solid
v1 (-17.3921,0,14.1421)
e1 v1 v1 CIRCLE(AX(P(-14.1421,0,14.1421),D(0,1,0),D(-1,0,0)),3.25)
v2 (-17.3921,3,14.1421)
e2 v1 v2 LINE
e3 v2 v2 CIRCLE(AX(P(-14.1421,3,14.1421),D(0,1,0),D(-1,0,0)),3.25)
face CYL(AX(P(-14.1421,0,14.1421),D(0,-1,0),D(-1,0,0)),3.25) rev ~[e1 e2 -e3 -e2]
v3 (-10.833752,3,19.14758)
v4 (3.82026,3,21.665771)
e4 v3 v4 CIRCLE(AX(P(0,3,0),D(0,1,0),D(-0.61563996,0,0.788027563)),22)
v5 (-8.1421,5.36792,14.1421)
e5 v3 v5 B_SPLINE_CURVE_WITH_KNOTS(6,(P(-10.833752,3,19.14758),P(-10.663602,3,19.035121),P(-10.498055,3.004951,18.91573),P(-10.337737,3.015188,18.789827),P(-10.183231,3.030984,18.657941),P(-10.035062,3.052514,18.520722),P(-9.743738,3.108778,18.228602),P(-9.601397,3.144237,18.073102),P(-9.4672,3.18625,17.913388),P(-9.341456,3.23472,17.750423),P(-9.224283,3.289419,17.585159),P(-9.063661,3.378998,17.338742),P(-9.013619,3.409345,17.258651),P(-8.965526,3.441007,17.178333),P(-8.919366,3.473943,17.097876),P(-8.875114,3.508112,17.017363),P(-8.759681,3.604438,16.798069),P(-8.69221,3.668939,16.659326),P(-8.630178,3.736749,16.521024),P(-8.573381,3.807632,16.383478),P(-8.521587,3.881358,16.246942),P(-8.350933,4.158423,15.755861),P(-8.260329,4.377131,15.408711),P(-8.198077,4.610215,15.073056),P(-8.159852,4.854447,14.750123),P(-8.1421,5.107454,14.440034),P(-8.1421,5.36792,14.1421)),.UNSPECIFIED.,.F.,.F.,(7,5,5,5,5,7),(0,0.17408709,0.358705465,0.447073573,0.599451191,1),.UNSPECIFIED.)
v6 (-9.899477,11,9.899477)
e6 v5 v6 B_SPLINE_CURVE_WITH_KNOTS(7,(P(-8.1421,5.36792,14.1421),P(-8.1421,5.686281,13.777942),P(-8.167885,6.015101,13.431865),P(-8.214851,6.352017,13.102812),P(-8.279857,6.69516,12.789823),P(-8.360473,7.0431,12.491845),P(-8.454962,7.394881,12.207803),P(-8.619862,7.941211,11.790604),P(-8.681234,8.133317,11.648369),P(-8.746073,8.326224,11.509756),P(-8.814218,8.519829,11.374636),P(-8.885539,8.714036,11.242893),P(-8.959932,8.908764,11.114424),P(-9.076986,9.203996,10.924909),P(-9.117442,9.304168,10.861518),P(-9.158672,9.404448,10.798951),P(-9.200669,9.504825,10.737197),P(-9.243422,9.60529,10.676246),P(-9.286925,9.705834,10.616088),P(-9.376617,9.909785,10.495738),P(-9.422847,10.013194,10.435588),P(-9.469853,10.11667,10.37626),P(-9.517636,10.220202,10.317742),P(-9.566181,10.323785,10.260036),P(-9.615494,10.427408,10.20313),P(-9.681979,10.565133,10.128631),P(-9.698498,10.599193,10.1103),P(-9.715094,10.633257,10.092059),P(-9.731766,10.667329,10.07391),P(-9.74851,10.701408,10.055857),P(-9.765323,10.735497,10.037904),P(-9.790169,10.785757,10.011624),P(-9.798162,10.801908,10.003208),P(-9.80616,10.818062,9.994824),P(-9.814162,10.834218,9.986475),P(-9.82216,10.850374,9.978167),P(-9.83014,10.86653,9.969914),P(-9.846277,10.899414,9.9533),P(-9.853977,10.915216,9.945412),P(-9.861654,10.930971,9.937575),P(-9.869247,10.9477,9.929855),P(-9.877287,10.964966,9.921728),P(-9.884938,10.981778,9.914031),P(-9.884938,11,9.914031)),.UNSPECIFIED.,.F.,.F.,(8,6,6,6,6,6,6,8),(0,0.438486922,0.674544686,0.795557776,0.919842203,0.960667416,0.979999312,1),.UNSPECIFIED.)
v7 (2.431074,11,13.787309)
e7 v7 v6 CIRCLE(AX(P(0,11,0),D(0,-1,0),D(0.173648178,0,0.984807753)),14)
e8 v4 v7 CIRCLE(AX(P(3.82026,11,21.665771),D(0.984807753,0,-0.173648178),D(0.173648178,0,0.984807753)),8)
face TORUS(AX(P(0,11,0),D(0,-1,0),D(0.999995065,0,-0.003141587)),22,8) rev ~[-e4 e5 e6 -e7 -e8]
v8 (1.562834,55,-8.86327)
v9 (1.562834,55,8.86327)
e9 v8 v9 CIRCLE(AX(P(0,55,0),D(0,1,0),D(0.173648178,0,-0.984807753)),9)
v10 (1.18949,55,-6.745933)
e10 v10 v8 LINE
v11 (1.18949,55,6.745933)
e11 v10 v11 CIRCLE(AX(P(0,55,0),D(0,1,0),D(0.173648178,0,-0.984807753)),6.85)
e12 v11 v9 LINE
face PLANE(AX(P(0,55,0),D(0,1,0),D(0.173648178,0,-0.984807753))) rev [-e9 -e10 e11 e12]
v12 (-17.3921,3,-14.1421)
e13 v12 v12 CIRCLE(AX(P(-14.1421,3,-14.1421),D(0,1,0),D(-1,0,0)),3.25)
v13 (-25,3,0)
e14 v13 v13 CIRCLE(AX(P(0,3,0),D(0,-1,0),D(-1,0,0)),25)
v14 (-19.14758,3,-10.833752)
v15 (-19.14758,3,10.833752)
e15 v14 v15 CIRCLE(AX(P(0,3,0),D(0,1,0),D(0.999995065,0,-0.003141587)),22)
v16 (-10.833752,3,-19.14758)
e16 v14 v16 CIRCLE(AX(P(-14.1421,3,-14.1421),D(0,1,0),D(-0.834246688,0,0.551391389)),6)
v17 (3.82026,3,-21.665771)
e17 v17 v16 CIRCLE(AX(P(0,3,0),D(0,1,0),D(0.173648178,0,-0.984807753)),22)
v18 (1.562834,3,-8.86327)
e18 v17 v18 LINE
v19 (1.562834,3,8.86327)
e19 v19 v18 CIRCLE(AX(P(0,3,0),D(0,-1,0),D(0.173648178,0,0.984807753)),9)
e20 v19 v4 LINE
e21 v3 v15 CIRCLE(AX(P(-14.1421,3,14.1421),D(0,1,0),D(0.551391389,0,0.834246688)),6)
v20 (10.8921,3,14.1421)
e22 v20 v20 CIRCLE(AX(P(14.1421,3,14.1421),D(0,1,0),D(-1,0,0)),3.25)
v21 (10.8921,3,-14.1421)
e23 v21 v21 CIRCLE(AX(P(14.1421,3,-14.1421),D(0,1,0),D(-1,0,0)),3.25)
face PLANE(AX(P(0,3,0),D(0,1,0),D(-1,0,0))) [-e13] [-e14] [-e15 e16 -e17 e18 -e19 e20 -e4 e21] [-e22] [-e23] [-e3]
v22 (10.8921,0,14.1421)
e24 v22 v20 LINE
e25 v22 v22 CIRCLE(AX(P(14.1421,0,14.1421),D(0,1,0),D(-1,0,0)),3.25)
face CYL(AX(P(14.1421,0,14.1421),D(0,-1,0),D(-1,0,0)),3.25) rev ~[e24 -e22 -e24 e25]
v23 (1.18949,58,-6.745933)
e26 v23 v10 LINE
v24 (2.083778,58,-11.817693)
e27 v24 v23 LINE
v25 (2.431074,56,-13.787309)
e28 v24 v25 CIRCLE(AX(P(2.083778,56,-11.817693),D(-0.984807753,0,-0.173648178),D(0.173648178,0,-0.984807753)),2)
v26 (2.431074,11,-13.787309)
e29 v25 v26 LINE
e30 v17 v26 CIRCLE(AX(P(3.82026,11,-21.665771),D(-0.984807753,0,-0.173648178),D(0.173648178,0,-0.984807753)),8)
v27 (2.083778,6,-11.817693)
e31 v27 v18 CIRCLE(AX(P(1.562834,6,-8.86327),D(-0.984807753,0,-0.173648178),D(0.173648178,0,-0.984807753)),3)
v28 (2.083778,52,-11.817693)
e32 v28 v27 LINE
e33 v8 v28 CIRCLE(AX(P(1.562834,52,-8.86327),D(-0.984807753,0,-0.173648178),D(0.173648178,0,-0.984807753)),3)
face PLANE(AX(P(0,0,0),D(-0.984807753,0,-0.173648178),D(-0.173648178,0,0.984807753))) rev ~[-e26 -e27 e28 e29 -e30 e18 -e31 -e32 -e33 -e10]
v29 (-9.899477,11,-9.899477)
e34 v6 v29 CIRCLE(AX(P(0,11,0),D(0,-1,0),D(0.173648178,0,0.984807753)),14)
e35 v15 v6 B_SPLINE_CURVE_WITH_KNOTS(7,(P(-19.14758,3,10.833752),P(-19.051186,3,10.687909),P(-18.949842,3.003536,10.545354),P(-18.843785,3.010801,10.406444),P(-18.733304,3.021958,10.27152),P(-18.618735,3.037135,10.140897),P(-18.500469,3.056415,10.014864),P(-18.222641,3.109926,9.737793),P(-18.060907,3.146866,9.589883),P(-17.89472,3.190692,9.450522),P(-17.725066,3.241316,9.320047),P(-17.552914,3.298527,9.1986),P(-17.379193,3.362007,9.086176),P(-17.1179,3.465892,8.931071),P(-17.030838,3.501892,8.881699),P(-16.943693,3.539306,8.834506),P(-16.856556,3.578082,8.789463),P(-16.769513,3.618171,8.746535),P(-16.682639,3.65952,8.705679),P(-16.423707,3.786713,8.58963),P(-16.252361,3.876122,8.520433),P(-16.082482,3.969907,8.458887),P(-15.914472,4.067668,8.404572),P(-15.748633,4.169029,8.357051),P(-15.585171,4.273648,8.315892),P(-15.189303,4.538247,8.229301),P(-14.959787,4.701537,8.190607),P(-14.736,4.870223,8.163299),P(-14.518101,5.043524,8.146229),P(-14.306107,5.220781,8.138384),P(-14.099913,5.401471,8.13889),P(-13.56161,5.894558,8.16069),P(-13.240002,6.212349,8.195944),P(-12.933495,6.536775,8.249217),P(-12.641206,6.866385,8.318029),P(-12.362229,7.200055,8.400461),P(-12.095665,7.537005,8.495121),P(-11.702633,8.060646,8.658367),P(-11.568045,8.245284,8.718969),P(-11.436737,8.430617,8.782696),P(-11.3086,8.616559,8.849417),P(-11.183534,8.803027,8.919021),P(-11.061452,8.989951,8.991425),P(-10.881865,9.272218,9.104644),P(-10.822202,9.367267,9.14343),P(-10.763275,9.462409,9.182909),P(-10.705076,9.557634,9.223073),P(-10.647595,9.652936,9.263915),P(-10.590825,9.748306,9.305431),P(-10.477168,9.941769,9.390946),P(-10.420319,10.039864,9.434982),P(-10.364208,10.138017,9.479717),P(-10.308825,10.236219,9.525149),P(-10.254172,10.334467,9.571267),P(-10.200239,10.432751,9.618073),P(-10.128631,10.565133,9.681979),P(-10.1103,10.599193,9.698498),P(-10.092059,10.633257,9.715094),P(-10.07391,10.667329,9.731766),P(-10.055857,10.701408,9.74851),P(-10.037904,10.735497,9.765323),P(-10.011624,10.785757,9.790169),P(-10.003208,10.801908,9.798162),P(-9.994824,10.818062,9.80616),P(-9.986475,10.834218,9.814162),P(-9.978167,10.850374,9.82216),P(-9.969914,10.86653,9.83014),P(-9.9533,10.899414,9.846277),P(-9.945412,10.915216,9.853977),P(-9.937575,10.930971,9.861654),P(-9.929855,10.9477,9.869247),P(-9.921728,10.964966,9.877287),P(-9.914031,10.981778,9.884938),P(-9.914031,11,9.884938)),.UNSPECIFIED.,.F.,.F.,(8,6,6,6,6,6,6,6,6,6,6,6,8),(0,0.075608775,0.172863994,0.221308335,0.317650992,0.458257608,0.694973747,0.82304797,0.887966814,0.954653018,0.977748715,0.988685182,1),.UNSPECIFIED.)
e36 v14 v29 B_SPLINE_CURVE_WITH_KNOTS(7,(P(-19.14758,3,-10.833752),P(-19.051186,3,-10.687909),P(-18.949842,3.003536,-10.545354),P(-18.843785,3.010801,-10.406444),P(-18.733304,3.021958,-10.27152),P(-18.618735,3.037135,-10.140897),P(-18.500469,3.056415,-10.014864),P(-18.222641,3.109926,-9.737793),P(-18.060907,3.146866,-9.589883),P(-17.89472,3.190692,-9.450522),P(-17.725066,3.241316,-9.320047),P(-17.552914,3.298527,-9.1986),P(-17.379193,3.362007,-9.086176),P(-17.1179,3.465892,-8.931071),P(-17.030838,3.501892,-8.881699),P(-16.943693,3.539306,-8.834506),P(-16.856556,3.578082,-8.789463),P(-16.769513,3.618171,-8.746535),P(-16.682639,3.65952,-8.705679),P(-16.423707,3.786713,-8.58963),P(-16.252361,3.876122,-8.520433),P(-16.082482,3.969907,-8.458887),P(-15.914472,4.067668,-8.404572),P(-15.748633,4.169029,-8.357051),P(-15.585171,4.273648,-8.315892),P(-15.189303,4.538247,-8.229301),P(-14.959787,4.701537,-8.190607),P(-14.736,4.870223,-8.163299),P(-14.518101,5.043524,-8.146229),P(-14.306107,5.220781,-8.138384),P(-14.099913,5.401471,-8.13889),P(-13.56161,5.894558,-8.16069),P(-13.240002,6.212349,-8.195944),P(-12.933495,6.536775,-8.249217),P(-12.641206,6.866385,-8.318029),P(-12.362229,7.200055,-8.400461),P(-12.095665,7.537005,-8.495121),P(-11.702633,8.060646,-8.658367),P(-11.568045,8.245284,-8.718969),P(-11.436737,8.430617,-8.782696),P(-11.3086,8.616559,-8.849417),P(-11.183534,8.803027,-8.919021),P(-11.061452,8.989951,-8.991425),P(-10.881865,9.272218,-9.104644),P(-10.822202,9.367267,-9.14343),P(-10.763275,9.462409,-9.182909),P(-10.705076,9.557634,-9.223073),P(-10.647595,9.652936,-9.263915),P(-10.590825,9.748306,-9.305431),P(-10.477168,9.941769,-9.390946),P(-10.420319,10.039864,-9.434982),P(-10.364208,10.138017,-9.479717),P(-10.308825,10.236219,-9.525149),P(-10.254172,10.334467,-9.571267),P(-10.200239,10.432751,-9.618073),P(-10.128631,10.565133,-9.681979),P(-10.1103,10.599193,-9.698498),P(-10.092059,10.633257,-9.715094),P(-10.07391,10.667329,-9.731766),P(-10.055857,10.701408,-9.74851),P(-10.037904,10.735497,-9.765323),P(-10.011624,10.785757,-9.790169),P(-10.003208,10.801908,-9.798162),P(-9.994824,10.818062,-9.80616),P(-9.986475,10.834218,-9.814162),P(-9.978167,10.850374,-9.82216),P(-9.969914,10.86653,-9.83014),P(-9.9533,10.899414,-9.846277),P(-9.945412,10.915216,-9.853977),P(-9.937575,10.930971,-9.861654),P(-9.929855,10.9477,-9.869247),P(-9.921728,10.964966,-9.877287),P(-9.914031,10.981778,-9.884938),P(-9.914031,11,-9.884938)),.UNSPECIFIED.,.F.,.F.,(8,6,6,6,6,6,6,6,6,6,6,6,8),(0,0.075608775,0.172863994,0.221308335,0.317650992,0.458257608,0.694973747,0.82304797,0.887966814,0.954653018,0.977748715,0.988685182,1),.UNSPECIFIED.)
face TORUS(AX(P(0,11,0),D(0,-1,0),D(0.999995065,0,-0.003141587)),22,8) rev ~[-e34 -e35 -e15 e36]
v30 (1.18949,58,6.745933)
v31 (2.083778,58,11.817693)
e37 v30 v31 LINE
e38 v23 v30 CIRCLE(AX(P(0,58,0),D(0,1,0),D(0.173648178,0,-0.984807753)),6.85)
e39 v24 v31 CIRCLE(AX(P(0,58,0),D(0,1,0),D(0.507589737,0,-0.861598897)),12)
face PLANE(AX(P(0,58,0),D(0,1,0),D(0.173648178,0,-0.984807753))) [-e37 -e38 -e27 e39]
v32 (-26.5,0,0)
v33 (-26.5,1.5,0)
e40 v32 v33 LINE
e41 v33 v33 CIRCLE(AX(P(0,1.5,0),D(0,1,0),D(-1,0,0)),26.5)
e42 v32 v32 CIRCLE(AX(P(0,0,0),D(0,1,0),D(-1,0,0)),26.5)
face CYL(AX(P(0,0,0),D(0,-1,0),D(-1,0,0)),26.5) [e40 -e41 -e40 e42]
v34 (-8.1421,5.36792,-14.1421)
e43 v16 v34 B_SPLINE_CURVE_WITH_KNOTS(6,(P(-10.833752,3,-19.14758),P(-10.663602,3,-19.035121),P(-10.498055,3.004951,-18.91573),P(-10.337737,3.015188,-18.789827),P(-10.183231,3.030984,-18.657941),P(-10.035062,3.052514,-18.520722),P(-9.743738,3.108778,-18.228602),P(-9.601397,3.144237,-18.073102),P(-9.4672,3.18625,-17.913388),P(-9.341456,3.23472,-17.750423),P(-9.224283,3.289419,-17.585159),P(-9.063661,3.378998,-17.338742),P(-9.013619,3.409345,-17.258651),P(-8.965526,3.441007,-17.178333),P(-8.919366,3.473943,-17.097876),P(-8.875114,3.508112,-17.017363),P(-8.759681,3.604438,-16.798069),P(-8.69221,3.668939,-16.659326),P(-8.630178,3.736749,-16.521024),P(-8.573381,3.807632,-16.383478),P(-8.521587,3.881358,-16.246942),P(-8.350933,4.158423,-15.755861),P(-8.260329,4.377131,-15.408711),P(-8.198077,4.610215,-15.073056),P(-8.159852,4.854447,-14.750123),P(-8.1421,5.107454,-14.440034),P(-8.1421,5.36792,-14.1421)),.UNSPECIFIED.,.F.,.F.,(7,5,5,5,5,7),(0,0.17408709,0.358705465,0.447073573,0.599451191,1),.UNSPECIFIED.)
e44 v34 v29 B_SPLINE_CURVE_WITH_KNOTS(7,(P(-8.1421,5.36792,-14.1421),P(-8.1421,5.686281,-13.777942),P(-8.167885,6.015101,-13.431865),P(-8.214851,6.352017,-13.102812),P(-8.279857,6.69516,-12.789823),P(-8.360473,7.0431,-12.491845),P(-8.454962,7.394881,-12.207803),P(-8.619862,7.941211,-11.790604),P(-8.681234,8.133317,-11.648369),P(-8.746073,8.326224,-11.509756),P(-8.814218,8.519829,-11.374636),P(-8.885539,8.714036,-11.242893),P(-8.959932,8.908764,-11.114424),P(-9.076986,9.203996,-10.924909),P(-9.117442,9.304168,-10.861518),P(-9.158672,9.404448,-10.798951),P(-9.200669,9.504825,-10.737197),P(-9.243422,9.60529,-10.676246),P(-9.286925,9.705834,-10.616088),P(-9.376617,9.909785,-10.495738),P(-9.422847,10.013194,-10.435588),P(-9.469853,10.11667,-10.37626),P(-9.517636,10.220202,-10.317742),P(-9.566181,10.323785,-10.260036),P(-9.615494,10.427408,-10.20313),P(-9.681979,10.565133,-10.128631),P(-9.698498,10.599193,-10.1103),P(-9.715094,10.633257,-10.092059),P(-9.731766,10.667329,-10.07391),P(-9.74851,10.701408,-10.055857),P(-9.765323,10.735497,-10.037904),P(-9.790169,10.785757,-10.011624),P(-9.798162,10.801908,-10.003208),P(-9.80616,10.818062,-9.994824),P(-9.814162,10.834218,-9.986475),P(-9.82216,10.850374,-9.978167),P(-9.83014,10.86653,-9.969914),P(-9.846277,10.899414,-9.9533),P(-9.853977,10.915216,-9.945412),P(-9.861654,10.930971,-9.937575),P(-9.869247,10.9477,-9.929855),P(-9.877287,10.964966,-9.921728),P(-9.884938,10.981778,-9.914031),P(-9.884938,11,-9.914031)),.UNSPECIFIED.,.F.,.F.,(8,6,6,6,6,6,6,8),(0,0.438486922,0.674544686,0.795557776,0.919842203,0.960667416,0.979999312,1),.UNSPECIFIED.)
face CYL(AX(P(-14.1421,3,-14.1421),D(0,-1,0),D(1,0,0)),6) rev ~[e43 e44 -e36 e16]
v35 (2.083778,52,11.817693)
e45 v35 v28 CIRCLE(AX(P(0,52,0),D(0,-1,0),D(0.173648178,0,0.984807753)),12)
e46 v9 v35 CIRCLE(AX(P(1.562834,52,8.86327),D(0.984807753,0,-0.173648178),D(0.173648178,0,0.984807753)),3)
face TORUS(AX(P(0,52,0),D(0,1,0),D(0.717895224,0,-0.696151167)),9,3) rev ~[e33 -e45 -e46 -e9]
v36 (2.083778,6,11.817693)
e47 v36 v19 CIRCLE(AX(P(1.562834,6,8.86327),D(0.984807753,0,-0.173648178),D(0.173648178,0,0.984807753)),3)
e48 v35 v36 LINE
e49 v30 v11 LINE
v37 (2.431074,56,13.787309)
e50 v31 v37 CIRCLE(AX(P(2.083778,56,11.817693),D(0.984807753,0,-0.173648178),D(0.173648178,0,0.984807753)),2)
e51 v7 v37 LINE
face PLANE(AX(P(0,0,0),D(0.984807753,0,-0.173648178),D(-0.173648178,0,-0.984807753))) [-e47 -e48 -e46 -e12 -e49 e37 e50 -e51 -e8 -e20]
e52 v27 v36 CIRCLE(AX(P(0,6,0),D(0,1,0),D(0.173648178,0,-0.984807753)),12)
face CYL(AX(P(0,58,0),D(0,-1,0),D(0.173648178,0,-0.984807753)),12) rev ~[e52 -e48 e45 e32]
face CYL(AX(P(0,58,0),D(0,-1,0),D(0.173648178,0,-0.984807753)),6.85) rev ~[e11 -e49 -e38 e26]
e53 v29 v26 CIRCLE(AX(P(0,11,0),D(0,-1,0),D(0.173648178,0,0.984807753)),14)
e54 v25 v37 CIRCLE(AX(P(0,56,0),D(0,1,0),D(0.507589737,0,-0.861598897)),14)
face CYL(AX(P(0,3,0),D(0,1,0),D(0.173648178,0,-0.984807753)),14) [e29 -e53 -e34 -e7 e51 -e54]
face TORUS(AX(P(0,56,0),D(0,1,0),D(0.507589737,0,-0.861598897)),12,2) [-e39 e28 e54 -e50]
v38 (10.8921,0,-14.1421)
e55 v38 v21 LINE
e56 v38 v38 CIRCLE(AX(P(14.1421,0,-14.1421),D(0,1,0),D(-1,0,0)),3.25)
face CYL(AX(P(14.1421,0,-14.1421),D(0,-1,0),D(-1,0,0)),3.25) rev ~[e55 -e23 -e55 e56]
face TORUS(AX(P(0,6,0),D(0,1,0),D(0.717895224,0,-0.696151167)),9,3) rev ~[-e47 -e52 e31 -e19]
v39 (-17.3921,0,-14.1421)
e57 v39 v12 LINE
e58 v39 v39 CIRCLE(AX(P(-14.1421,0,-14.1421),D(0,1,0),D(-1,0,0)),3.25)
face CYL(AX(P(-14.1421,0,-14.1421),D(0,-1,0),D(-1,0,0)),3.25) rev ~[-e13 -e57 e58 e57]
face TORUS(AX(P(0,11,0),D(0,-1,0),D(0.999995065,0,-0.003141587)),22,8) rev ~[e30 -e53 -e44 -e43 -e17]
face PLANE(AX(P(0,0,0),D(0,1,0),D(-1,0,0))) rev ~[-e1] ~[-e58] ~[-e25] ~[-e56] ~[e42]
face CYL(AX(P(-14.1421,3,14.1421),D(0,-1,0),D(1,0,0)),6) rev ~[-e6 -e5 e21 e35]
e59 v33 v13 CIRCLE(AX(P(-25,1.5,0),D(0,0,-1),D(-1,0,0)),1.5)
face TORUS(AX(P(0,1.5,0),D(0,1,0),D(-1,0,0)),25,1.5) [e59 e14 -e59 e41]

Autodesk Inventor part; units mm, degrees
ref_plane "YZ Plane" through (0, 0, 0) normal (1, 0, 0) x (0, 1, 0)
ref_plane "XZ Plane" through (0, 0, 0) normal (0, 1, 0) x (-1, 0, 0)
ref_plane "XY Plane" through (0, 0, 0) normal (0, 0, 1) x (1, 0, 0)
sketch "Sketch1" plane through (0, 0, 0) normal (0, 1, 0) x (-1, 0, 0)
  circle A0 centre (0, 0) radius 26.5
  circle A1 centre (-14.1421, 14.1421) radius 3.25
  circle A2 centre (-14.1421, -14.1421) radius 3.25
  circle A3 centre (14.1421, -14.1421) radius 3.25
  circle A4 centre (14.1421, 14.1421) radius 3.25
  line L0 (0, 0) -> (0, 26.5) construction
  line L1 (0, 0) -> (-18.7383, 18.7383) construction
  dimension "d0" = 53
  dimension "d1" = 6.5
  dimension "d2" = 20
  dimension "d5" = 360
  dimension "d9" = 45
extrude "Extrusion1" add sketch "Sketch1" along normal blind 3
sketch "Sketch2" plane through (0, 0, 0) normal (0, 0, 1) x (1, 0, 0)
  line L0 (26.5, 3) -> (-26.5, 3) projected
  line L1 (-12, 3) -> (-14, 3)
  line L2 (-14, 3) -> (-14, 58)
  line L3 (-14, 58) -> (-12, 58)
  line L4 (-12, 58) -> (-12, 3)
  line L5 (-14, 58) -> (-6.85, 58)
  line L6 (-6.85, 58) -> (-6.85, 55)
  line L7 (-6.85, 55) -> (-14, 55)
  line L8 (-14, 55) -> (-14, 58)
  line L9 (0, -11.6) -> (0, 69.6) projected
  point P0 (0, 0)
  point P1 (-12, 55)
  dimension "d10" = 12
  dimension "d11" = 6.85
  dimension "d12" = 2
  dimension "d13" = 55
  dimension "d14" = 3
revolve "Revolution1" add sketch "Sketch2" angle 200 mid plane about axis through (0, -10, 0) along (0, 1, 0)
fillet "Fillet1" radius 8 1 edges at (-14, 3, 0)
fillet "Fillet1" radius 3 1 edges at (-12, 55, 0)
fillet "Fillet1" radius 3 1 edges at (-12, 3, 0)
fillet "Fillet1" radius 2 1 edges at (-14, 58, 0)
fillet "Fillet1" radius 1.5 1 edges at (26.5, 3, 0)
sketch "Sketch3" plane through (0, 3, 0) normal (0, 1, 0) x (1, 0, 0)
  circle A0 centre (14.1421, 14.1421) radius 3.25 projected
  circle A1 centre (14.1421, 14.1421) radius 6
  circle A2 centre (-14.1421, 14.1421) radius 6
  circle A3 centre (-14.1421, -14.1421) radius 6
  circle A4 centre (14.1421, -14.1421) radius 6
  arc A5 (2.4311, 13.7873) -> (2.4311, -13.7873) centre (0, 0) ccw projected
  dimension "d23" = 360
  dimension "d27" = 12
extrude "Extrusion2" cut sketch "Sketch3" along normal blind 8 contours A0 | A1 | A2 | A3 | A4
properties part number "_3DPrint"
